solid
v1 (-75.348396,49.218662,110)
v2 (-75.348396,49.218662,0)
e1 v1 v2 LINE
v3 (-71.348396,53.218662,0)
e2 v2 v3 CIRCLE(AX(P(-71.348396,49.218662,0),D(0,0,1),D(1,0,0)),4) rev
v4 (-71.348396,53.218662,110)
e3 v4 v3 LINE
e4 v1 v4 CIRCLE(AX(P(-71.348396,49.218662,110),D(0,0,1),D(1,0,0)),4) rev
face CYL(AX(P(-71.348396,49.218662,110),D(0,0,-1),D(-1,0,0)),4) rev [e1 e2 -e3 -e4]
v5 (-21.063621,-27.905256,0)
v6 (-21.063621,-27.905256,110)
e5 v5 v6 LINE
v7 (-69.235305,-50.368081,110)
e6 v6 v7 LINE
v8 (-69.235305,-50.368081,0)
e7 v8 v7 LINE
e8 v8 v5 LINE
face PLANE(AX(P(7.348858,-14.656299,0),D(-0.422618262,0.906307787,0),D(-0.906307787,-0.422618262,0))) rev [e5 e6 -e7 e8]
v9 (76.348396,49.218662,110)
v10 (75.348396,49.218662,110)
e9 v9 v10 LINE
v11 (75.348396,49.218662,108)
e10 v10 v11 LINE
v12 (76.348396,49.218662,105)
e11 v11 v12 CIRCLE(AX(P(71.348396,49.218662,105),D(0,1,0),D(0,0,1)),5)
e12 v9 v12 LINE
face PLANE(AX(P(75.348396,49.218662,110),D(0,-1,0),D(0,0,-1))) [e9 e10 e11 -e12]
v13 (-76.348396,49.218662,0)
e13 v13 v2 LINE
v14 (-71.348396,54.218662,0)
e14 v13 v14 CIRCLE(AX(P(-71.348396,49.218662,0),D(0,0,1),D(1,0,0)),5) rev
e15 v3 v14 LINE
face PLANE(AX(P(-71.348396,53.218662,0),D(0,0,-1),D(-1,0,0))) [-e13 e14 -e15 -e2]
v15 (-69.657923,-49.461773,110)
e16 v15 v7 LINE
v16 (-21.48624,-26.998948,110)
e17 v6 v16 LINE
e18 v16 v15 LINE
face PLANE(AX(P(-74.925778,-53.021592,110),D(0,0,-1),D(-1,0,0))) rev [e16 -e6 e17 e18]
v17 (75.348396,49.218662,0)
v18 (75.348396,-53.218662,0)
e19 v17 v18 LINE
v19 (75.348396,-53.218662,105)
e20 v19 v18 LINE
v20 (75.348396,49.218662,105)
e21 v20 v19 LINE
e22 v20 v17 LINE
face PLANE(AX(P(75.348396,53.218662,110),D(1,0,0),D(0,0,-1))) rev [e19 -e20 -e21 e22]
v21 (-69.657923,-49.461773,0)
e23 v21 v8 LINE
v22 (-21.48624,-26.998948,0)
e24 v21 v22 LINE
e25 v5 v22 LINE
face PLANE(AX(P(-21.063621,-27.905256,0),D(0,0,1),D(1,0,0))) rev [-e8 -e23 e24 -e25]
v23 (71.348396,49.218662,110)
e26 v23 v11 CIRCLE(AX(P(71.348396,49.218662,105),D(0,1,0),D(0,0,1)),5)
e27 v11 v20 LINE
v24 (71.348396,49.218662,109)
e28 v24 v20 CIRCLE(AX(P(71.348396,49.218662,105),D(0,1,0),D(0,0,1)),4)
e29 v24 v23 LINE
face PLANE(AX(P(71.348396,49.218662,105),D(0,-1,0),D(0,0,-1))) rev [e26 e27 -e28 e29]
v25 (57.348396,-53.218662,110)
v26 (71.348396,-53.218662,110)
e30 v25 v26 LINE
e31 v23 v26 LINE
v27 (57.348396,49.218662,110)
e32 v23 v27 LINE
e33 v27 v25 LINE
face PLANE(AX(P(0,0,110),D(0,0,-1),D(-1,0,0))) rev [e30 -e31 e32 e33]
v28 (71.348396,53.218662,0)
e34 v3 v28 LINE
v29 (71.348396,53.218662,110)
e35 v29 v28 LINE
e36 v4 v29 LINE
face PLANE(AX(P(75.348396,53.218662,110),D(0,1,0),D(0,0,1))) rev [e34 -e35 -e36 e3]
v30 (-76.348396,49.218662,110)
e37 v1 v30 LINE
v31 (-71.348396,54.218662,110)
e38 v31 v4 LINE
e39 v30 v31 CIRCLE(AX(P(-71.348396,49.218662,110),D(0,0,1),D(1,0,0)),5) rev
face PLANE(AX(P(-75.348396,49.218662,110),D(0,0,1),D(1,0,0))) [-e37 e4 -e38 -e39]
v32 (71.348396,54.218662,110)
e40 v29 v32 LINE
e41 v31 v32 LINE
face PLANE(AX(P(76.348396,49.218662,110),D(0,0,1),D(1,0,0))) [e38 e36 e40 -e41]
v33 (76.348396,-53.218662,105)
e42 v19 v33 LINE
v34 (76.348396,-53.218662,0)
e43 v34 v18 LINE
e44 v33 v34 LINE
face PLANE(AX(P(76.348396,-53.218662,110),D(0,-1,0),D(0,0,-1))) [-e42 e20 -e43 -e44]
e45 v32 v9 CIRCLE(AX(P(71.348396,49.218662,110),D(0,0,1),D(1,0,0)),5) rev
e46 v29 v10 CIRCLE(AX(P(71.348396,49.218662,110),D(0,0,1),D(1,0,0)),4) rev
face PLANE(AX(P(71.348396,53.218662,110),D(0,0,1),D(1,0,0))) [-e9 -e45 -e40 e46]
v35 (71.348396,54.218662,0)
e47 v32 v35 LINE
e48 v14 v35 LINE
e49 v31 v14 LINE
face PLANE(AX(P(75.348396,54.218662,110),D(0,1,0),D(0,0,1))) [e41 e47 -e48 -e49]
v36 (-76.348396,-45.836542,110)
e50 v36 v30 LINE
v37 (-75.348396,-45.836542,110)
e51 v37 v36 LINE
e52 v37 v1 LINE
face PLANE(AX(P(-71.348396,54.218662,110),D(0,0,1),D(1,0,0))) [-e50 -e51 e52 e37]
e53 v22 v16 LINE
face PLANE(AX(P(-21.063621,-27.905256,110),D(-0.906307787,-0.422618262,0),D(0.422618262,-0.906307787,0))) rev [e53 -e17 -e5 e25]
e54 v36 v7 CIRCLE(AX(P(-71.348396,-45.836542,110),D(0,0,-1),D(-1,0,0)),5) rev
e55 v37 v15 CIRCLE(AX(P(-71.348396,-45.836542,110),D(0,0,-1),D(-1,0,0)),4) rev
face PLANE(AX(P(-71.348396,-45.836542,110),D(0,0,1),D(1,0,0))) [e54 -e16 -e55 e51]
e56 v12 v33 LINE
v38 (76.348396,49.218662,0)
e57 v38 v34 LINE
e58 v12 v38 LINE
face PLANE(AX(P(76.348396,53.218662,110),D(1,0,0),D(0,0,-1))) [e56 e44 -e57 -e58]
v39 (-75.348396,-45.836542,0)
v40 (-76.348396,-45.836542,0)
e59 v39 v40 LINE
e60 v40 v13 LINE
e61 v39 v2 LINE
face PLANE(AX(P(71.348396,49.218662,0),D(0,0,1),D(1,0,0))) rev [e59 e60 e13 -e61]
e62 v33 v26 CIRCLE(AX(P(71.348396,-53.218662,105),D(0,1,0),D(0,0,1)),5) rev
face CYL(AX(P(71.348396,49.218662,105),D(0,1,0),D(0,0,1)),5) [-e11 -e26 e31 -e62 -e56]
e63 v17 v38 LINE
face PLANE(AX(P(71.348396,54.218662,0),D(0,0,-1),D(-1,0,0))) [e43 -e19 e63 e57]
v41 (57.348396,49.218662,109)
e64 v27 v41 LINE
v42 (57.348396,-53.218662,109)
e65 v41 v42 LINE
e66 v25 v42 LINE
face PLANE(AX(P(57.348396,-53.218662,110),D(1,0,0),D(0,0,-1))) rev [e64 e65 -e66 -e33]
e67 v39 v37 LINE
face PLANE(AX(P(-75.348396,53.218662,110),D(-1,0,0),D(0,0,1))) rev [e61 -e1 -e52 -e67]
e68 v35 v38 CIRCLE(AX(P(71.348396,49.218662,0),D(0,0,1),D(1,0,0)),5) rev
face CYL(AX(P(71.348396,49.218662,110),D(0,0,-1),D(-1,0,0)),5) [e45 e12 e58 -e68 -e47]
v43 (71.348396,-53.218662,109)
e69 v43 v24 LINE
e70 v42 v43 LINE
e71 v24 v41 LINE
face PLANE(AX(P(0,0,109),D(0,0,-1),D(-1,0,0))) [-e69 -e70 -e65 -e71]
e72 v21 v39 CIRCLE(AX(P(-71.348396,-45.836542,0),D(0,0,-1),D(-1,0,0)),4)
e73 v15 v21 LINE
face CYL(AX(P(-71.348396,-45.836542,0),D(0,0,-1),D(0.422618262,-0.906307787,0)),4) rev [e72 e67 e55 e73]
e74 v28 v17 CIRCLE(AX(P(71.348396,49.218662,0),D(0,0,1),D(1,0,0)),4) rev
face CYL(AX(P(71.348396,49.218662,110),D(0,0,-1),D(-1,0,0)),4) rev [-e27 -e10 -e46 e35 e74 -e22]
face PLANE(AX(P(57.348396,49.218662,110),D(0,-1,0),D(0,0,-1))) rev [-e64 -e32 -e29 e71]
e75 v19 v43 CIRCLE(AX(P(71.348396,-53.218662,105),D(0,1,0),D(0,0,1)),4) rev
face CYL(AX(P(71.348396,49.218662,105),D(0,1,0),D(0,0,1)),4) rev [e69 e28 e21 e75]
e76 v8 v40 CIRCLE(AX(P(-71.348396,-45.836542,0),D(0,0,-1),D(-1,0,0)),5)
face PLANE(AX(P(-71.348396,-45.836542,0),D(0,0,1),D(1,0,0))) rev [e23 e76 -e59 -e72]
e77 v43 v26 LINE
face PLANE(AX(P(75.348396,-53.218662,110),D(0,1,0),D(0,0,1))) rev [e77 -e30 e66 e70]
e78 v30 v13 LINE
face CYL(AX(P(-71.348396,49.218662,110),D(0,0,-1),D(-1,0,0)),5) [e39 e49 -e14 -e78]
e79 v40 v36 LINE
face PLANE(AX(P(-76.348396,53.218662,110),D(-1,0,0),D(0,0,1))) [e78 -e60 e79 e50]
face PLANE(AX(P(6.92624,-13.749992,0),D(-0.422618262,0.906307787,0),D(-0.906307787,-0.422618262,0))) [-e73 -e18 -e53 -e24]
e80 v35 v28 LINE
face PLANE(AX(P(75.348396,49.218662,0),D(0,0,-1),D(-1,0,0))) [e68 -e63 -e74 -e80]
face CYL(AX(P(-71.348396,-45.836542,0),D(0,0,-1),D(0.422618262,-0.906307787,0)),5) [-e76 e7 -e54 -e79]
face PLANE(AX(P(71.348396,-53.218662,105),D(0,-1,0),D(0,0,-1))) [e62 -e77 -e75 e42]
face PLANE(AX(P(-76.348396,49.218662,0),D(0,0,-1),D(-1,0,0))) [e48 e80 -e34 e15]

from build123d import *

# Parameters (mm, degrees)
BASE_FLANGE1_DEPTH           = 110
EDGE_FLANGE1_DEPTH           = 110
EDGE_FLANGE1_2_DEPTH         = 110
EDGE_FLANGE2_STRIP_W         = 12
EDGE_FLANGE2_STRIP_H         = 1
EDGE_FLANGE2_STRIP_CUT_DEPTH = 102.437324841
EDGE_FLANGE2_DEPTH           = 102.437324841


# Read off the part's stored shape, not the designer's step: Edge-Flange1
# Sheet-metal steps are written as plain solids
with BuildPart() as part:
    # Sketch1 → Base-Flange1 (new body)
    with BuildSketch(Plane.XY):
        with BuildLine():
            Line((75.34839628, -53.21866242), (75.34839628, 49.21866242))
            ThreePointArc((75.34839628, 49.21866242), (74.176823405, 52.047089545), (71.34839628, 53.21866242))
            Line((71.34839628, 53.21866242), (-71.34839628, 53.21866242))
            ThreePointArc((-71.34839628, 53.21866242), (-74.176823405, 52.047089545), (-75.34839628, 49.21866242))
            Line((-75.34839628, 49.21866242), (-75.34839628, -53.21866242))
            Line((-75.34839628, -53.21866242), (-76.34839628, -53.21866242))
            Line((-76.34839628, -53.21866242), (-76.34839628, 49.21866242))
            ThreePointArc((-76.34839628, 49.21866242), (-74.883930186, 52.754196326), (-71.34839628, 54.21866242))
            Line((-71.34839628, 54.21866242), (71.34839628, 54.21866242))
            ThreePointArc((71.34839628, 54.21866242), (74.883930186, 52.754196326), (76.34839628, 49.21866242))
            Line((76.34839628, 49.21866242), (76.34839628, -53.21866242))
            Line((76.34839628, -53.21866242), (75.34839628, -53.21866242))
        make_face()
    extrude(amount=BASE_FLANGE1_DEPTH)

    # Edge-Flange1 outline → Edge-Flange1 (cut)
    with BuildSketch(Plane.XY):
        with BuildLine():
            Line((-75.34839628, -53.21866242), (-75.34839628, -48.836542193))
            ThreePointArc((-75.34839628, -48.836542193), (-76.09181277, -47.417681023), (-76.34839628, -45.836542193))
            Line((-76.34839628, -45.836542193), (-76.34839628, -53.21866242))
            Line((-76.34839628, -53.21866242), (-75.34839628, -53.21866242))
        make_face()
    extrude(amount=EDGE_FLANGE1_DEPTH, mode=Mode.SUBTRACT)

    # Edge-Flange1 2 outline → Edge-Flange1 2 (add)
    with BuildSketch(Plane.XY):
        with BuildLine():
            ThreePointArc((-75.34839628, -48.836542193), (-72.563513138, -50.686644359), (-69.235304971, -50.368081128))
            Line((-69.235304971, -50.368081128), (-21.063621271, -27.905256112))
            Line((-21.063621271, -27.905256112), (-21.486239533, -26.998948325))
            Line((-21.486239533, -26.998948325), (-69.657923233, -49.461773341))
            ThreePointArc((-69.657923233, -49.461773341), (-73.497594713, -49.210107976), (-75.34839628, -45.836542193))
            Line((-75.34839628, -45.836542193), (-75.34839628, -48.836542193))
        make_face()
    extrude(amount=EDGE_FLANGE1_2_DEPTH)

    # Edge-Flange2 strip (across the edge) → Edge-Flange2 strip cut (cut)
    with BuildSketch(Plane(origin=(75.34839628, -53.21866242, 110), x_dir=(0, 0, -1), z_dir=(0, 1, 0))):
        with Locations((-1, -0.5)):
            Rectangle(EDGE_FLANGE2_STRIP_W, EDGE_FLANGE2_STRIP_H)
    extrude(amount=EDGE_FLANGE2_STRIP_CUT_DEPTH, mode=Mode.SUBTRACT)

    # Edge-Flange2 section (across the edge) → Edge-Flange2 (add)
    with BuildSketch(Plane(origin=(75.34839628, -53.21866242, 110), x_dir=(0, 0, -1), z_dir=(0, 1, 0))):
        with BuildLine():
            Line((0, 4), (0, 18))
            Line((0, 18), (1, 18))
            Line((1, 18), (1, 4))
            ThreePointArc((1, 4), (2.171572875, 1.171572875), (5, 0))
            Line((5, 0), (5, -1))
            ThreePointArc((5, -1), (1.464466094, 0.464466094), (0, 4))
        make_face()
    extrude(amount=EDGE_FLANGE2_DEPTH)


solid = part.part
